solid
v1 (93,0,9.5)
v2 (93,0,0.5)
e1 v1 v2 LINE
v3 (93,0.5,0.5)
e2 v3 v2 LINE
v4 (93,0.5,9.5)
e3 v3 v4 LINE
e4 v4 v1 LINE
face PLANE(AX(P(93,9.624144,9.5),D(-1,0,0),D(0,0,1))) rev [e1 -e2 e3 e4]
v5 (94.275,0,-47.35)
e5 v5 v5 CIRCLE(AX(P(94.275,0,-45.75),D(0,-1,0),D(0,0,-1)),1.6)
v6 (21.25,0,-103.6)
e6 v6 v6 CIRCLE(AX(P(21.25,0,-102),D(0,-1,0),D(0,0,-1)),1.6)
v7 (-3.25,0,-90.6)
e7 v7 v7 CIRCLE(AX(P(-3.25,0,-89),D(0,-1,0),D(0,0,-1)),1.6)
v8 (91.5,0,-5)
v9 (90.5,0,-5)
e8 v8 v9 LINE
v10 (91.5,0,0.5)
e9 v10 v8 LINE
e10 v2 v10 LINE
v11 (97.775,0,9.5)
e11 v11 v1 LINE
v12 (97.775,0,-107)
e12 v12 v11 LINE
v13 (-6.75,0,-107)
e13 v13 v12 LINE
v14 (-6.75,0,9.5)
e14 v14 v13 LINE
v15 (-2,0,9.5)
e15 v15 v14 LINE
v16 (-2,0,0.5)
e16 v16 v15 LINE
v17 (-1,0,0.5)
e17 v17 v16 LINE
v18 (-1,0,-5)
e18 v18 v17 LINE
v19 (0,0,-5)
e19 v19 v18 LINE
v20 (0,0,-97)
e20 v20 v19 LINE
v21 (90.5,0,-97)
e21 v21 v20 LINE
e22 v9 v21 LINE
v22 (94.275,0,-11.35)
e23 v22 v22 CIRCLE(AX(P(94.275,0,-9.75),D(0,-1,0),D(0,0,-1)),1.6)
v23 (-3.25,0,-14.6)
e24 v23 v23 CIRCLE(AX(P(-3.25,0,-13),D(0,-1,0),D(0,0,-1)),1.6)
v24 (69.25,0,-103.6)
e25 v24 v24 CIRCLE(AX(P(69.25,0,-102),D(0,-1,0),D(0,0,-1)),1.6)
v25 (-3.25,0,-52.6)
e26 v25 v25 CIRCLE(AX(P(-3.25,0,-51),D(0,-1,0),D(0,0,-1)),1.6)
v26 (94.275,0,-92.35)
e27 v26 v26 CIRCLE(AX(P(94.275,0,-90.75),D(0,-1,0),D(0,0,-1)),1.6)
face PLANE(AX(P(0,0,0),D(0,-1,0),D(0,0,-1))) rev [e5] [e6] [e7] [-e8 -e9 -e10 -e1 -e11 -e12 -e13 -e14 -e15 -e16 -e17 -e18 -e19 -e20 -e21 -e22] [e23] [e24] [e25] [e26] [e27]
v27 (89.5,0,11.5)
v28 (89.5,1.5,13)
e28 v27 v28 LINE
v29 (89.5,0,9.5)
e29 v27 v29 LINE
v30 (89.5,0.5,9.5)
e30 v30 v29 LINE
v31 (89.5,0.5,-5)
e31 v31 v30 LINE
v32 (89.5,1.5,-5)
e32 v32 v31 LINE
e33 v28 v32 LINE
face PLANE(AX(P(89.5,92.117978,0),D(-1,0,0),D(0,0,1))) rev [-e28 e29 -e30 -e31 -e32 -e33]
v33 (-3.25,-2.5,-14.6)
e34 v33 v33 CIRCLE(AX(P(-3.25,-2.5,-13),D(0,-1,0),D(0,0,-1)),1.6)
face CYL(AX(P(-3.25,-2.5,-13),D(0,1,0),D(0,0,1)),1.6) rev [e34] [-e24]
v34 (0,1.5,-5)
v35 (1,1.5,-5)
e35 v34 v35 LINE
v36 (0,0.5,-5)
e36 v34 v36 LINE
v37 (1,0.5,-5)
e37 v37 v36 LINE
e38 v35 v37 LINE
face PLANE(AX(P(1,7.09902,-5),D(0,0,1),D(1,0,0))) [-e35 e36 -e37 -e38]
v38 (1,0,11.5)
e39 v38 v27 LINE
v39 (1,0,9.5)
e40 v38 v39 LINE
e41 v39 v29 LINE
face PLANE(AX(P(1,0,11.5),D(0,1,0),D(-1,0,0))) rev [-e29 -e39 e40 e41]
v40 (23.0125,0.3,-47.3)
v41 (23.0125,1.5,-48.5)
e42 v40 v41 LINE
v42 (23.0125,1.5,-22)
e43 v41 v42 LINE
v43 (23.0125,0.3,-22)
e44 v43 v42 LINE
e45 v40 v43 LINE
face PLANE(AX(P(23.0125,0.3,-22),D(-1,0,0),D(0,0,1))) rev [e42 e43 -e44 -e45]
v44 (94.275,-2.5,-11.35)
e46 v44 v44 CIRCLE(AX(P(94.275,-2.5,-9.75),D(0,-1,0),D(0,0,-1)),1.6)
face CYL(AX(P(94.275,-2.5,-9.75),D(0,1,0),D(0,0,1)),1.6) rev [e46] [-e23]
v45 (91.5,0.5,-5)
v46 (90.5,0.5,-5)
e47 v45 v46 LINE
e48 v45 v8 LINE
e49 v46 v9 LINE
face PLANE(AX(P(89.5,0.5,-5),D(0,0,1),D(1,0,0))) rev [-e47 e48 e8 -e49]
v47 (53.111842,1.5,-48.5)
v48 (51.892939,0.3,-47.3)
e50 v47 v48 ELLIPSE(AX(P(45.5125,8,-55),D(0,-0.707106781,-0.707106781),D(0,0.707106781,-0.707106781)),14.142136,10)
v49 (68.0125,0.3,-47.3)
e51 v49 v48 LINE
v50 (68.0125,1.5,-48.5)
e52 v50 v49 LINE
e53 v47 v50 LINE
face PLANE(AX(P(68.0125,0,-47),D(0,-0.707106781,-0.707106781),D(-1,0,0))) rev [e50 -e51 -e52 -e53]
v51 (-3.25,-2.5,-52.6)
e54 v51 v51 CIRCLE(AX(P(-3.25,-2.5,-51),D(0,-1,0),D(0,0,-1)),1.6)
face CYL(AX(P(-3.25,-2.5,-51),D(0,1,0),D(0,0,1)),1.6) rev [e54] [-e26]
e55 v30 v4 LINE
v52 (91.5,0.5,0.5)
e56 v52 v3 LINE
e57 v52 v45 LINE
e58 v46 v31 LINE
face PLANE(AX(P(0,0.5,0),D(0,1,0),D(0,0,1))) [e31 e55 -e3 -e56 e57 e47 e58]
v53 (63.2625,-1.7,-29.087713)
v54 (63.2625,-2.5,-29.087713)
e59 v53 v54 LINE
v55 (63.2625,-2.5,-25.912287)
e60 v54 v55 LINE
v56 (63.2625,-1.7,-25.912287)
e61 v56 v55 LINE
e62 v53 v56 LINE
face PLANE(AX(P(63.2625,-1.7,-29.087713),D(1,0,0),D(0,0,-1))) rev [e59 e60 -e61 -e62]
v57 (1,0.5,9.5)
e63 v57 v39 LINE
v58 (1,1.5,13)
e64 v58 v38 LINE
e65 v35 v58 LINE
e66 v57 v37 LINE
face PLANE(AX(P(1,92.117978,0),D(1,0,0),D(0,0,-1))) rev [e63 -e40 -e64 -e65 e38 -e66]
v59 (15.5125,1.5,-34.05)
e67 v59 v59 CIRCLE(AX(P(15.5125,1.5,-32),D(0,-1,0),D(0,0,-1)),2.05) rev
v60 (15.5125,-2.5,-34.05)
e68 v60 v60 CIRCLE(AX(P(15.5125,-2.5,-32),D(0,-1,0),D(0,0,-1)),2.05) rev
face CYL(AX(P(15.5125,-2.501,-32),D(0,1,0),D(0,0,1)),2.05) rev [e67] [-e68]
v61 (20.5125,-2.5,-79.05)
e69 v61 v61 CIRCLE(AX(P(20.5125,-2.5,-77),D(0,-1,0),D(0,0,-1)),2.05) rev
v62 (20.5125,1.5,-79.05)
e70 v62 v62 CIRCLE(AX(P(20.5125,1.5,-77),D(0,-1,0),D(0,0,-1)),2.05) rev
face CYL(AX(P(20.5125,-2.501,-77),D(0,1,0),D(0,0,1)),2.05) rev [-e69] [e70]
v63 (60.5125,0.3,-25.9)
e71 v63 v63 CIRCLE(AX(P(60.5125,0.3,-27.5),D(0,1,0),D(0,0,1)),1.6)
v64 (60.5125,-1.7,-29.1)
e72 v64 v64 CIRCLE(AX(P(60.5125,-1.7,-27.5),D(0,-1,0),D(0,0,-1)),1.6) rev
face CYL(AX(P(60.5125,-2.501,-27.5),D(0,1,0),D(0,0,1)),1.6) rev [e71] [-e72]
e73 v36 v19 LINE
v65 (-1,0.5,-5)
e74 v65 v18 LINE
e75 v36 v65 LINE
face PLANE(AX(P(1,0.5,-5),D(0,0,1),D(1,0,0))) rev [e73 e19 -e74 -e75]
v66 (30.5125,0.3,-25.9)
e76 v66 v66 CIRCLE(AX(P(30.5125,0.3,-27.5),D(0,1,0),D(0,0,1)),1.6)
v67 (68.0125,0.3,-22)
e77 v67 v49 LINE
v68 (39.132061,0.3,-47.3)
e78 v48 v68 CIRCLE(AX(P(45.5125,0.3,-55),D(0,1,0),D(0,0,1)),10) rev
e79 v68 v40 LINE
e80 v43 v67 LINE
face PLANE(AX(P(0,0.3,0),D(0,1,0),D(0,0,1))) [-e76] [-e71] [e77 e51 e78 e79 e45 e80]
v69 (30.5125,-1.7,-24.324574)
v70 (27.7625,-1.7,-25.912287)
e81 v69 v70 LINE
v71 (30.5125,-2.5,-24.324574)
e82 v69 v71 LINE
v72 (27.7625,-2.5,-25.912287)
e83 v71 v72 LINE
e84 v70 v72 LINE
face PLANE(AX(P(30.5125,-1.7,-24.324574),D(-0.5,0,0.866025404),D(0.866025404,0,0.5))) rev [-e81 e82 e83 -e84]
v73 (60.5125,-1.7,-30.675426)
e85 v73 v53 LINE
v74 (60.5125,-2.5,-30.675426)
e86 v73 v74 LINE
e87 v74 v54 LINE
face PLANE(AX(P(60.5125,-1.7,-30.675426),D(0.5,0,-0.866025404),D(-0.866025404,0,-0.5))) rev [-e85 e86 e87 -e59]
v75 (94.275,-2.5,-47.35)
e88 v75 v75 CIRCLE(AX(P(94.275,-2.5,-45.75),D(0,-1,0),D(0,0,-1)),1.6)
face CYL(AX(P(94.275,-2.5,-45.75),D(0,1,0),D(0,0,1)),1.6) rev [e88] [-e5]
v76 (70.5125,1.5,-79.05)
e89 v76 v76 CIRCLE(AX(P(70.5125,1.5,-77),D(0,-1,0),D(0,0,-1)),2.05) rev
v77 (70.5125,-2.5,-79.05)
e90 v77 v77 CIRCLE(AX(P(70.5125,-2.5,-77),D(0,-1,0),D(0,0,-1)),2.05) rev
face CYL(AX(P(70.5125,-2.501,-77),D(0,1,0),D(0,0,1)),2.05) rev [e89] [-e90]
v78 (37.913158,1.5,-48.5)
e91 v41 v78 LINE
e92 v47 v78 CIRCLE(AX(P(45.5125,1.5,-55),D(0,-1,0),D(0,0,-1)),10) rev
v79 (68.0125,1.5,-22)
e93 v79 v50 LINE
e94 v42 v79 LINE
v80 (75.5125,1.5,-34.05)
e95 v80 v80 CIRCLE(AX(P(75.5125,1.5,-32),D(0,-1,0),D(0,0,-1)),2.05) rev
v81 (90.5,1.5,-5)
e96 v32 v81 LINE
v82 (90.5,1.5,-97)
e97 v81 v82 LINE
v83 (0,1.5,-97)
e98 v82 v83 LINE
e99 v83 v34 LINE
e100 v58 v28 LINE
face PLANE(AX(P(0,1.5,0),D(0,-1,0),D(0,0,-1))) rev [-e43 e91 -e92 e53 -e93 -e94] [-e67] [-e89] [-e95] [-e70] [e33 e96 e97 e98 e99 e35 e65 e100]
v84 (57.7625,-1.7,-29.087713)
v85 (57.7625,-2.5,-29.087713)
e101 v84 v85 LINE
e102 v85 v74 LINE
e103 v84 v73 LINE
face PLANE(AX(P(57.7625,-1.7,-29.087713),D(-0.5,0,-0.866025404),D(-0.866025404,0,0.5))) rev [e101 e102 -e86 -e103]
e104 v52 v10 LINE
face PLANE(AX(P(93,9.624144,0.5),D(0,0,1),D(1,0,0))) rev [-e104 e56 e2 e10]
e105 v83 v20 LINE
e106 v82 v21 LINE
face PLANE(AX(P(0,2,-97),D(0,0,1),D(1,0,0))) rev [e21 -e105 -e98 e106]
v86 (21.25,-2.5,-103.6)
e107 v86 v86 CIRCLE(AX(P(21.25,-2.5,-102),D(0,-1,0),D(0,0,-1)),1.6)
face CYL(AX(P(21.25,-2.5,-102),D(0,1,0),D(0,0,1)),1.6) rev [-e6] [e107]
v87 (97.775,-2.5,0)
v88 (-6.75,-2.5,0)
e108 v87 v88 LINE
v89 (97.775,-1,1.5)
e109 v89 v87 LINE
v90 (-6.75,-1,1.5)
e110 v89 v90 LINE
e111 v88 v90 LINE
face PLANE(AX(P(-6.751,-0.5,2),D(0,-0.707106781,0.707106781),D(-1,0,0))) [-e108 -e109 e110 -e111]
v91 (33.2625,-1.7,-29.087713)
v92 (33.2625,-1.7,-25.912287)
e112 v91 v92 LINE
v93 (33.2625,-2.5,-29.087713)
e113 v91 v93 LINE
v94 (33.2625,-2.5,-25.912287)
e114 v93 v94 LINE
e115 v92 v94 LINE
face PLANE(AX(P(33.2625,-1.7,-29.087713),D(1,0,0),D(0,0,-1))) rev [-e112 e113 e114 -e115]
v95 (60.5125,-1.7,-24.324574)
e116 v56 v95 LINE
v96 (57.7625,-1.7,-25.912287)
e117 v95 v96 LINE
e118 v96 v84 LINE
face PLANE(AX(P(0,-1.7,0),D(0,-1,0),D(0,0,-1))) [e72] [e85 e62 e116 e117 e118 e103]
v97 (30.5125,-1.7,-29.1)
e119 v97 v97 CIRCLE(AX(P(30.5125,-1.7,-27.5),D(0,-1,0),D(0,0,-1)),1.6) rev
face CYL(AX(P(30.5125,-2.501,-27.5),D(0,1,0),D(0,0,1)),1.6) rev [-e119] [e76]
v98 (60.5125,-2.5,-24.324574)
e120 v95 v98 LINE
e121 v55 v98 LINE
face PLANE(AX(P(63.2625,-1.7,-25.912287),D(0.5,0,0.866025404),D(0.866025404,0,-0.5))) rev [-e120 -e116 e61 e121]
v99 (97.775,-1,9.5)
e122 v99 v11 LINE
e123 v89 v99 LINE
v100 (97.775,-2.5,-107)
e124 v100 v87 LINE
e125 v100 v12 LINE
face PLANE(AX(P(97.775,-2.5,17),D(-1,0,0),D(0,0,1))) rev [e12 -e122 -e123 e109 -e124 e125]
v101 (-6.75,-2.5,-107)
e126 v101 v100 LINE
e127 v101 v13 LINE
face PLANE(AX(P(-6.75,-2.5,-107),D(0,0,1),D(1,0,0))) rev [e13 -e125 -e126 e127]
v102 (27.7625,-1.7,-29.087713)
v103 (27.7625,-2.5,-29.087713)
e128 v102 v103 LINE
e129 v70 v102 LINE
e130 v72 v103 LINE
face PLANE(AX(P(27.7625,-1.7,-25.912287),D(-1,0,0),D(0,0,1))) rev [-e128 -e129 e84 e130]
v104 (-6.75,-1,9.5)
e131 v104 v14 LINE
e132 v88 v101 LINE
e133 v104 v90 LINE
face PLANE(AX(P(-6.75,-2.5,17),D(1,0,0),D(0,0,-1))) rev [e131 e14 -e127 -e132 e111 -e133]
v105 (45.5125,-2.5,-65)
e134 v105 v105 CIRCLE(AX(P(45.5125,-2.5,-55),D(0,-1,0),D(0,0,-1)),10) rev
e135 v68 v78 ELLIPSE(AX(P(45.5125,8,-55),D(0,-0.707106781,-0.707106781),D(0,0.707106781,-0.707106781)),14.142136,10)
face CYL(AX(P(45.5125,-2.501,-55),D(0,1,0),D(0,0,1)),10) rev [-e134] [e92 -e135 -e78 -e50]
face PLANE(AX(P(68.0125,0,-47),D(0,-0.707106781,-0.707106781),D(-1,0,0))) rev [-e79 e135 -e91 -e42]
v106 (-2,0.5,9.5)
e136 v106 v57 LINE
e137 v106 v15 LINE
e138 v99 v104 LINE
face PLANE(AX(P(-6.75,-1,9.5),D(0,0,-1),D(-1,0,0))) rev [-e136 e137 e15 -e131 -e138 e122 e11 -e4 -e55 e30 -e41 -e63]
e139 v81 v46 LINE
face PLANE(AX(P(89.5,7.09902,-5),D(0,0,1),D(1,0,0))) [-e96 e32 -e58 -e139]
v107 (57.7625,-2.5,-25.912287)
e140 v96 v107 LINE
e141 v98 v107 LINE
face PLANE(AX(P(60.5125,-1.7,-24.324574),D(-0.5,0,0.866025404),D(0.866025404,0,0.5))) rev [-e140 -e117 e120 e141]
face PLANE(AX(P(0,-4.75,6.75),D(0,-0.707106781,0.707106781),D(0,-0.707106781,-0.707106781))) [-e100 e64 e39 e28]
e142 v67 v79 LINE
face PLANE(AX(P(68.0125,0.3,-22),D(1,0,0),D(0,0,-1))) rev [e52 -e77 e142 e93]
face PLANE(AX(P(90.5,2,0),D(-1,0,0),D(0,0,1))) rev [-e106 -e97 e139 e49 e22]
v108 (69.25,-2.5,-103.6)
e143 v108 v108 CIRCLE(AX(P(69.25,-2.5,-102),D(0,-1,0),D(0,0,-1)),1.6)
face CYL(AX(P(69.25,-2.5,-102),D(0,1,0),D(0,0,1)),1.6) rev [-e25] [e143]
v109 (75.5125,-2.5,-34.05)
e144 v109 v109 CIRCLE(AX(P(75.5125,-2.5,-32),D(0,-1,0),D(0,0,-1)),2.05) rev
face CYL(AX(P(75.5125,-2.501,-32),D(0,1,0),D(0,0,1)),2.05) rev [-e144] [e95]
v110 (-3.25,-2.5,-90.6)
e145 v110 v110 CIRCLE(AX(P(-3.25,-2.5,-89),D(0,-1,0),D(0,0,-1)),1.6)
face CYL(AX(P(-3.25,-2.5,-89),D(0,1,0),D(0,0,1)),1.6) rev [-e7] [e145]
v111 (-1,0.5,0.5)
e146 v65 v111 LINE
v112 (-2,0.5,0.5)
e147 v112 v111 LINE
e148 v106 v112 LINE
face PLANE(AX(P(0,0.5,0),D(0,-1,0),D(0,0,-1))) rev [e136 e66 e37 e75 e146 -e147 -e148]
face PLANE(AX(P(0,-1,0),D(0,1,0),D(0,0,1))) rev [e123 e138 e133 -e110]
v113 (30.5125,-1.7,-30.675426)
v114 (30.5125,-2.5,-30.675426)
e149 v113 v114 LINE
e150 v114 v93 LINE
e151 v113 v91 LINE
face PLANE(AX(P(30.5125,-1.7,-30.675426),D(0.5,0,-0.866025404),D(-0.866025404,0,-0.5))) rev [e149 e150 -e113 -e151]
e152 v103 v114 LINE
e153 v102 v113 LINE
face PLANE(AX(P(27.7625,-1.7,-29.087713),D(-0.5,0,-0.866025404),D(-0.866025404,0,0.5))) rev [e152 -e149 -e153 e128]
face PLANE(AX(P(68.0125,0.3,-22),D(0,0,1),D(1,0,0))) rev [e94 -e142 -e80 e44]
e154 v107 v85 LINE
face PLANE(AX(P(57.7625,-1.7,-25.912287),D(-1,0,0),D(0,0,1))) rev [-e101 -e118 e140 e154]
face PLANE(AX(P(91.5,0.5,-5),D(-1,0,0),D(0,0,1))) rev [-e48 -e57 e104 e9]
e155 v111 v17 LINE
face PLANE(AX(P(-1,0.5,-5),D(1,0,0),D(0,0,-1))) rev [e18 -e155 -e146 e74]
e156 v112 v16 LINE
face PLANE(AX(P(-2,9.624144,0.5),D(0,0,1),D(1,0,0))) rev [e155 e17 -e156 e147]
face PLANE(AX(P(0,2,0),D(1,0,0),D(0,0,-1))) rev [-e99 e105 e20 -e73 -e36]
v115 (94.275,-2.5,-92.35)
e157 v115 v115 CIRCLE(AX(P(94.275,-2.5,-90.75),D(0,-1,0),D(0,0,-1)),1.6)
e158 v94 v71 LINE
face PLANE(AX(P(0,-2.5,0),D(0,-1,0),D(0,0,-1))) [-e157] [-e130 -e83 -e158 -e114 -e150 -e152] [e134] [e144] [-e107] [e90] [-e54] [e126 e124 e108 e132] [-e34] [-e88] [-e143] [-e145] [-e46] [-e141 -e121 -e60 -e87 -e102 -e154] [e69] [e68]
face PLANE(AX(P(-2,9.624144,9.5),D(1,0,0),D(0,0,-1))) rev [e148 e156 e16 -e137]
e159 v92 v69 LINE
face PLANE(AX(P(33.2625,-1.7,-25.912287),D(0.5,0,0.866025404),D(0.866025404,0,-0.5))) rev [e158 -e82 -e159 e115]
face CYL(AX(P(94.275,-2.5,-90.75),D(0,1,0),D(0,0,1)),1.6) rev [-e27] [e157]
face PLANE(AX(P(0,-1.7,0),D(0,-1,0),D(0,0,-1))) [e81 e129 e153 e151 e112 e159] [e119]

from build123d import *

# Parameters (mm, degrees)
SKETCH_1_W          = 90.5
SKETCH_1_H          = 97
EXTRUDE_1_DEPTH     = 2
SKETCH_2_W          = 104.525
SKETCH_2_H          = 124
SKETCH_2_R          = 1.6
EXTRUDE_2_DEPTH     = 2.5
SKETCH_3_W          = 88.5
SKETCH_3_H          = 17
EXTRUDE_3_DEPTH     = 2
SKETCH_4_W          = 1
SKETCH_4_H          = 5
CUT_EXTRUDE_1_DEPTH = 2
CUT_EXTRUDE_2_DEPTH = 150.601890446
SKETCH_6_W          = 45
SKETCH_6_H          = 25
CUT_EXTRUDE_3_DEPTH = 1.7
CUT_EXTRUDE_4_REACH = 146.972
SKETCH_7_R          = 1.6
CHAMFER_1_SIZE      = 2
CUT_EXTRUDE_5_REACH = 147.014
SKETCH_8_R          = 2.05
CUT_EXTRUDE_6_REACH = 147.014
SKETCH_9_R          = 10
CUT_EXTRUDE_7_DEPTH = 0.8
CUT_EXTRUDE_8_REACH = 151.602
SKETCH_11_W         = 6.5
SKETCH_11_H         = 2.5
CHAMFER_2_SIZE      = 2
SKETCH_12_W         = 104.525
SKETCH_12_H         = 9.5
EXTRUDE_4_DEPTH     = 1
SKETCH_13_W         = 2
SKETCH_13_H         = 14.5
EXTRUDE_5_DEPTH     = 0.5
SKETCH_14_W         = 1.5
SKETCH_14_H         = 9
SKETCH_14_W_2       = 1
EXTRUDE_6_DEPTH     = 0.5
SKETCH_15_W         = 88.5
SKETCH_15_H         = 2.828427125
EXTRUDE_7_DEPTH     = 2
CUT_EXTRUDE_9_DEPTH = 0.5


with BuildPart() as part:
    # 草图1 → 凸台-拉伸1 (new body)
    with BuildSketch(Plane(origin=(0, 0, 0), x_dir=(1, 0, 0), z_dir=(0, 1, 0))):
        with Locations((45.25, 48.5)):
            Rectangle(SKETCH_1_W, SKETCH_1_H)
    extrude(amount=EXTRUDE_1_DEPTH)

    # 草图2 → 凸台-拉伸2 (add)
    with BuildSketch(Plane.XZ):
        with Locations((45.5125, -45)):
            Rectangle(SKETCH_2_W, SKETCH_2_H)
        with Locations(Location((21.25, -102, 0), (0, 0, 270))):
            Circle(SKETCH_2_R, mode=Mode.SUBTRACT)
        with Locations(Location((69.25, -102, 0), (0, 0, 270))):
            Circle(SKETCH_2_R, mode=Mode.SUBTRACT)
        with Locations(Location((-3.25, -89, 0), (0, 0, 270))):
            Circle(SKETCH_2_R, mode=Mode.SUBTRACT)
        with Locations(Location((94.275, -90.75, 0), (0, 0, 270))):
            Circle(SKETCH_2_R, mode=Mode.SUBTRACT)
        with Locations(Location((-3.25, -13, 0), (0, 0, 270))):
            Circle(SKETCH_2_R, mode=Mode.SUBTRACT)
        with Locations(Location((-3.25, -51, 0), (0, 0, 270))):
            Circle(SKETCH_2_R, mode=Mode.SUBTRACT)
        with Locations(Location((94.275, -9.75, 0), (0, 0, 270))):
            Circle(SKETCH_2_R, mode=Mode.SUBTRACT)
        with Locations(Location((94.275, -45.75, 0), (0, 0, 270))):
            Circle(SKETCH_2_R, mode=Mode.SUBTRACT)
    extrude(amount=EXTRUDE_2_DEPTH)

    # 草图3 → 凸台-拉伸3 (add)
    with BuildSketch(Plane(origin=(0, 0, 0), x_dir=(1, 0, 0), z_dir=(0, 1, 0))):
        with Locations((45.25, -8.5)):
            Rectangle(SKETCH_3_W, SKETCH_3_H)
    extrude(amount=EXTRUDE_3_DEPTH)

    # 草图4 → 切除-拉伸1 (cut)
    with BuildSketch(Plane(origin=(0, 0, 0), x_dir=(1, 0, 0), z_dir=(0, 1, 0))):
        with Locations((0.5, 2.5)):
            Rectangle(SKETCH_4_W, SKETCH_4_H)
        with Locations((90, 2.5)):
            Rectangle(SKETCH_4_W, SKETCH_4_H)
    extrude(amount=CUT_EXTRUDE_1_DEPTH, mode=Mode.SUBTRACT)

    # 草图5 → 切除-拉伸2 (cut, through all)
    with BuildSketch(Plane(origin=(97.775, 0, 0), x_dir=(0, 0, -1), z_dir=(1, 0, 0))):
        Polygon((-8.5, -2.5), (-8.5, 0), (-9.5, 0), (-11.5, 2), (-17, 2), (-17, -2.5), align=None)
    extrude(amount=-CUT_EXTRUDE_2_DEPTH, mode=Mode.SUBTRACT)

    # 草图6 → 切除-拉伸3 (cut)
    with BuildSketch(Plane(origin=(0, 2, 0), x_dir=(1, 0, 0), z_dir=(0, 1, 0))):
        with Locations((45.5125, 34.5)):
            Rectangle(SKETCH_6_W, SKETCH_6_H)
    extrude(amount=-CUT_EXTRUDE_3_DEPTH, mode=Mode.SUBTRACT)

    # 草图7 → 切除-拉伸4 (cut, up to next)
    with BuildSketch(Plane(origin=(0, 0.3, 0), x_dir=(1, 0, 0), z_dir=(0, 1, 0)), mode=Mode.PRIVATE) as cut_extrude_4_sk1:
        with Locations(Location((30.5125, 27.5, 0), (0, 0, 270))):
            Circle(SKETCH_7_R)
    cut_extrude_4_tool1 = extrude(cut_extrude_4_sk1.sketch, amount=-CUT_EXTRUDE_4_REACH, mode=Mode.PRIVATE) & part.part
    # 草图7 → 切除-拉伸4 (cut, up to next)
    with BuildSketch(Plane(origin=(0, 0.3, 0), x_dir=(1, 0, 0), z_dir=(0, 1, 0)), mode=Mode.PRIVATE) as cut_extrude_4_sk2:
        with Locations(Location((60.5125, 27.5, 0), (0, 0, 270))):
            Circle(SKETCH_7_R)
    cut_extrude_4_tool2 = extrude(cut_extrude_4_sk2.sketch, amount=-CUT_EXTRUDE_4_REACH, mode=Mode.PRIVATE) & part.part
    add(cut_extrude_4_tool1.solids().sort_by_distance((30.5125, 0.3, -27.5))[0], mode=Mode.SUBTRACT)
    add(cut_extrude_4_tool2.solids().sort_by_distance((60.5125, 0.3, -27.5))[0], mode=Mode.SUBTRACT)

    # 倒角1
    # the kernel refuses this chamfer: 2 mm, written as the material it adds along each edge
    # the kernel refuses this chamfer: 2 mm, written as the material it takes off along each edge
    with BuildSketch(Plane(origin=(23.0125, 2, -47), x_dir=(0, 0.027495876610586296, -0.9996219169112968), z_dir=(1, 0, 0))) as chamfer_1_2_piece_1_section:
        Polygon((CHAMFER_1_SIZE * 0.999621916911, -CHAMFER_1_SIZE * 0.0274958766106), (-CHAMFER_1_SIZE * 0.0274958766106, -CHAMFER_1_SIZE * 0.999621916911), (0, 0), align=None)
    chamfer_1_2_piece_1 = extrude(amount=45, mode=Mode.PRIVATE)
    chamfer_1_2_piece_1 = split(chamfer_1_2_piece_1, bisect_by=Plane(origin=(45.5125, 0.3, -47.679710145), z_dir=(0, 1, 0)), keep=Keep.TOP, mode=Mode.PRIVATE)
    add(chamfer_1_2_piece_1, mode=Mode.SUBTRACT)

    # 草图8 → 切除-拉伸5 (cut, up to next)
    with BuildSketch(Plane(origin=(0, 2, 0), x_dir=(1, 0, 0), z_dir=(0, 1, 0)), mode=Mode.PRIVATE) as cut_extrude_5_sk1:
        with Locations(Location((20.5125, 77, 0), (0, 0, 270))):
            Circle(SKETCH_8_R)
    cut_extrude_5_tool1 = extrude(cut_extrude_5_sk1.sketch, amount=-CUT_EXTRUDE_5_REACH, mode=Mode.PRIVATE) & part.part
    # 草图8 → 切除-拉伸5 (cut, up to next)
    with BuildSketch(Plane(origin=(0, 2, 0), x_dir=(1, 0, 0), z_dir=(0, 1, 0)), mode=Mode.PRIVATE) as cut_extrude_5_sk2:
        with Locations(Location((70.5125, 77, 0), (0, 0, 270))):
            Circle(SKETCH_8_R)
    cut_extrude_5_tool2 = extrude(cut_extrude_5_sk2.sketch, amount=-CUT_EXTRUDE_5_REACH, mode=Mode.PRIVATE) & part.part
    # 草图8 → 切除-拉伸5 (cut, up to next)
    with BuildSketch(Plane(origin=(0, 2, 0), x_dir=(1, 0, 0), z_dir=(0, 1, 0)), mode=Mode.PRIVATE) as cut_extrude_5_sk3:
        with Locations(Location((15.5125, 32, 0), (0, 0, 270))):
            Circle(SKETCH_8_R)
    cut_extrude_5_tool3 = extrude(cut_extrude_5_sk3.sketch, amount=-CUT_EXTRUDE_5_REACH, mode=Mode.PRIVATE) & part.part
    # 草图8 → 切除-拉伸5 (cut, up to next)
    with BuildSketch(Plane(origin=(0, 2, 0), x_dir=(1, 0, 0), z_dir=(0, 1, 0)), mode=Mode.PRIVATE) as cut_extrude_5_sk4:
        with Locations(Location((75.5125, 32, 0), (0, 0, 270))):
            Circle(SKETCH_8_R)
    cut_extrude_5_tool4 = extrude(cut_extrude_5_sk4.sketch, amount=-CUT_EXTRUDE_5_REACH, mode=Mode.PRIVATE) & part.part
    add(cut_extrude_5_tool1.solids().sort_by_distance((20.5125, 2, -77))[0], mode=Mode.SUBTRACT)
    add(cut_extrude_5_tool2.solids().sort_by_distance((70.5125, 2, -77))[0], mode=Mode.SUBTRACT)
    add(cut_extrude_5_tool3.solids().sort_by_distance((15.5125, 2, -32))[0], mode=Mode.SUBTRACT)
    add(cut_extrude_5_tool4.solids().sort_by_distance((75.5125, 2, -32))[0], mode=Mode.SUBTRACT)

    # 草图9 → 切除-拉伸6 (cut, up to next)
    with BuildSketch(Plane(origin=(0, 2, 0), x_dir=(1, 0, 0), z_dir=(0, 1, 0)), mode=Mode.PRIVATE) as cut_extrude_6_sk1:
        with Locations(Location((45.5125, 55, 0), (0, 0, 230.353888853))):
            Circle(SKETCH_9_R)
    cut_extrude_6_tool1 = extrude(cut_extrude_6_sk1.sketch, amount=-CUT_EXTRUDE_6_REACH, mode=Mode.PRIVATE) & part.part
    add(cut_extrude_6_tool1.solids().sort_by_distance((45.5125, 2, -55))[0], mode=Mode.SUBTRACT)

    # 草图10 → 切除-拉伸7 (cut)
    with BuildSketch(Plane.XZ.offset(2.5)):
        Polygon((27.7625, -25.91228676), (27.7625, -29.08771324), (30.5125, -30.675426481), (33.2625, -29.08771324), (33.2625, -25.91228676), (30.5125, -24.324573519), align=None)
        Polygon((57.7625, -25.91228676), (57.7625, -29.08771324), (60.5125, -30.675426481), (63.2625, -29.08771324), (63.2625, -25.91228676), (60.5125, -24.324573519), align=None)
    extrude(amount=-CUT_EXTRUDE_7_DEPTH, mode=Mode.SUBTRACT)

    # 草图11 → 切除-拉伸8 (cut, up to next)
    with BuildSketch(Plane(origin=(97.775, 0, 0), x_dir=(0, 0, -1), z_dir=(1, 0, 0)), mode=Mode.PRIVATE) as cut_extrude_8_sk1:
        with Locations((-5.25, -1.25)):
            Rectangle(SKETCH_11_W, SKETCH_11_H)
    cut_extrude_8_tool1 = extrude(cut_extrude_8_sk1.sketch, amount=-CUT_EXTRUDE_8_REACH, mode=Mode.PRIVATE) & part.part
    add(cut_extrude_8_tool1.solids().sort_by_distance((97.775, -1.25, 5.25))[0], mode=Mode.SUBTRACT)

    # 倒角2
    chamfer_2_edges = [part.edges().sort_by_distance(p)[0] for p in [
        (45.5125, -2.5, 2),
    ]]
    chamfer(chamfer_2_edges, length=CHAMFER_2_SIZE)

    # 草图12 → 凸台-拉伸4 (add)
    with BuildSketch(Plane.XZ):
        with Locations((45.5125, 4.75)):
            Rectangle(SKETCH_12_W, SKETCH_12_H)
    extrude(amount=EXTRUDE_4_DEPTH)

    # 草图13 → 凸台-拉伸5 (add)
    with BuildSketch(Plane(origin=(0, 0, 0), x_dir=(1, 0, 0), z_dir=(0, 1, 0))):
        with Locations((0, -2.25)):
            Rectangle(SKETCH_13_W, SKETCH_13_H)
        with Locations((90.5, -2.25)):
            Rectangle(SKETCH_13_W, SKETCH_13_H)
    extrude(amount=EXTRUDE_5_DEPTH)

    # 草图14 → 凸台-拉伸6 (add)
    with BuildSketch(Plane(origin=(0, 0, 0), x_dir=(1, 0, 0), z_dir=(0, 1, 0))):
        with Locations((92.25, -5)):
            Rectangle(SKETCH_14_W, SKETCH_14_H)
        with Locations((-1.5, -5)):
            Rectangle(SKETCH_14_W_2, SKETCH_14_H)
    extrude(amount=EXTRUDE_6_DEPTH)

    # 草图15 → 凸台-拉伸7 (add, along a direction that is not the sketch's normal)
    with BuildSketch(Plane(origin=(0, -4.75, 4.75), x_dir=(1, 0, 0), z_dir=(0, -0.7071067811865501, 0.7071067811865449))):
        with Locations((45.25, 8.131727983)):
            Rectangle(SKETCH_15_W, SKETCH_15_H)
    extrude(amount=EXTRUDE_7_DEPTH, dir=(0, 0, 1))

    # 草图16 → 切除-拉伸9 (cut)
    with BuildSketch(Plane(origin=(0, 2, 0), x_dir=(1, 0, 0), z_dir=(0, 1, 0))):
        Polygon((1, 5), (1, -13.5), (89.5, -13.5), (89.5, 5), (90.5, 5), (90.5, 97), (0, 97), (0, 5), align=None)
    extrude(amount=-CUT_EXTRUDE_9_DEPTH, mode=Mode.SUBTRACT)


solid = part.part
